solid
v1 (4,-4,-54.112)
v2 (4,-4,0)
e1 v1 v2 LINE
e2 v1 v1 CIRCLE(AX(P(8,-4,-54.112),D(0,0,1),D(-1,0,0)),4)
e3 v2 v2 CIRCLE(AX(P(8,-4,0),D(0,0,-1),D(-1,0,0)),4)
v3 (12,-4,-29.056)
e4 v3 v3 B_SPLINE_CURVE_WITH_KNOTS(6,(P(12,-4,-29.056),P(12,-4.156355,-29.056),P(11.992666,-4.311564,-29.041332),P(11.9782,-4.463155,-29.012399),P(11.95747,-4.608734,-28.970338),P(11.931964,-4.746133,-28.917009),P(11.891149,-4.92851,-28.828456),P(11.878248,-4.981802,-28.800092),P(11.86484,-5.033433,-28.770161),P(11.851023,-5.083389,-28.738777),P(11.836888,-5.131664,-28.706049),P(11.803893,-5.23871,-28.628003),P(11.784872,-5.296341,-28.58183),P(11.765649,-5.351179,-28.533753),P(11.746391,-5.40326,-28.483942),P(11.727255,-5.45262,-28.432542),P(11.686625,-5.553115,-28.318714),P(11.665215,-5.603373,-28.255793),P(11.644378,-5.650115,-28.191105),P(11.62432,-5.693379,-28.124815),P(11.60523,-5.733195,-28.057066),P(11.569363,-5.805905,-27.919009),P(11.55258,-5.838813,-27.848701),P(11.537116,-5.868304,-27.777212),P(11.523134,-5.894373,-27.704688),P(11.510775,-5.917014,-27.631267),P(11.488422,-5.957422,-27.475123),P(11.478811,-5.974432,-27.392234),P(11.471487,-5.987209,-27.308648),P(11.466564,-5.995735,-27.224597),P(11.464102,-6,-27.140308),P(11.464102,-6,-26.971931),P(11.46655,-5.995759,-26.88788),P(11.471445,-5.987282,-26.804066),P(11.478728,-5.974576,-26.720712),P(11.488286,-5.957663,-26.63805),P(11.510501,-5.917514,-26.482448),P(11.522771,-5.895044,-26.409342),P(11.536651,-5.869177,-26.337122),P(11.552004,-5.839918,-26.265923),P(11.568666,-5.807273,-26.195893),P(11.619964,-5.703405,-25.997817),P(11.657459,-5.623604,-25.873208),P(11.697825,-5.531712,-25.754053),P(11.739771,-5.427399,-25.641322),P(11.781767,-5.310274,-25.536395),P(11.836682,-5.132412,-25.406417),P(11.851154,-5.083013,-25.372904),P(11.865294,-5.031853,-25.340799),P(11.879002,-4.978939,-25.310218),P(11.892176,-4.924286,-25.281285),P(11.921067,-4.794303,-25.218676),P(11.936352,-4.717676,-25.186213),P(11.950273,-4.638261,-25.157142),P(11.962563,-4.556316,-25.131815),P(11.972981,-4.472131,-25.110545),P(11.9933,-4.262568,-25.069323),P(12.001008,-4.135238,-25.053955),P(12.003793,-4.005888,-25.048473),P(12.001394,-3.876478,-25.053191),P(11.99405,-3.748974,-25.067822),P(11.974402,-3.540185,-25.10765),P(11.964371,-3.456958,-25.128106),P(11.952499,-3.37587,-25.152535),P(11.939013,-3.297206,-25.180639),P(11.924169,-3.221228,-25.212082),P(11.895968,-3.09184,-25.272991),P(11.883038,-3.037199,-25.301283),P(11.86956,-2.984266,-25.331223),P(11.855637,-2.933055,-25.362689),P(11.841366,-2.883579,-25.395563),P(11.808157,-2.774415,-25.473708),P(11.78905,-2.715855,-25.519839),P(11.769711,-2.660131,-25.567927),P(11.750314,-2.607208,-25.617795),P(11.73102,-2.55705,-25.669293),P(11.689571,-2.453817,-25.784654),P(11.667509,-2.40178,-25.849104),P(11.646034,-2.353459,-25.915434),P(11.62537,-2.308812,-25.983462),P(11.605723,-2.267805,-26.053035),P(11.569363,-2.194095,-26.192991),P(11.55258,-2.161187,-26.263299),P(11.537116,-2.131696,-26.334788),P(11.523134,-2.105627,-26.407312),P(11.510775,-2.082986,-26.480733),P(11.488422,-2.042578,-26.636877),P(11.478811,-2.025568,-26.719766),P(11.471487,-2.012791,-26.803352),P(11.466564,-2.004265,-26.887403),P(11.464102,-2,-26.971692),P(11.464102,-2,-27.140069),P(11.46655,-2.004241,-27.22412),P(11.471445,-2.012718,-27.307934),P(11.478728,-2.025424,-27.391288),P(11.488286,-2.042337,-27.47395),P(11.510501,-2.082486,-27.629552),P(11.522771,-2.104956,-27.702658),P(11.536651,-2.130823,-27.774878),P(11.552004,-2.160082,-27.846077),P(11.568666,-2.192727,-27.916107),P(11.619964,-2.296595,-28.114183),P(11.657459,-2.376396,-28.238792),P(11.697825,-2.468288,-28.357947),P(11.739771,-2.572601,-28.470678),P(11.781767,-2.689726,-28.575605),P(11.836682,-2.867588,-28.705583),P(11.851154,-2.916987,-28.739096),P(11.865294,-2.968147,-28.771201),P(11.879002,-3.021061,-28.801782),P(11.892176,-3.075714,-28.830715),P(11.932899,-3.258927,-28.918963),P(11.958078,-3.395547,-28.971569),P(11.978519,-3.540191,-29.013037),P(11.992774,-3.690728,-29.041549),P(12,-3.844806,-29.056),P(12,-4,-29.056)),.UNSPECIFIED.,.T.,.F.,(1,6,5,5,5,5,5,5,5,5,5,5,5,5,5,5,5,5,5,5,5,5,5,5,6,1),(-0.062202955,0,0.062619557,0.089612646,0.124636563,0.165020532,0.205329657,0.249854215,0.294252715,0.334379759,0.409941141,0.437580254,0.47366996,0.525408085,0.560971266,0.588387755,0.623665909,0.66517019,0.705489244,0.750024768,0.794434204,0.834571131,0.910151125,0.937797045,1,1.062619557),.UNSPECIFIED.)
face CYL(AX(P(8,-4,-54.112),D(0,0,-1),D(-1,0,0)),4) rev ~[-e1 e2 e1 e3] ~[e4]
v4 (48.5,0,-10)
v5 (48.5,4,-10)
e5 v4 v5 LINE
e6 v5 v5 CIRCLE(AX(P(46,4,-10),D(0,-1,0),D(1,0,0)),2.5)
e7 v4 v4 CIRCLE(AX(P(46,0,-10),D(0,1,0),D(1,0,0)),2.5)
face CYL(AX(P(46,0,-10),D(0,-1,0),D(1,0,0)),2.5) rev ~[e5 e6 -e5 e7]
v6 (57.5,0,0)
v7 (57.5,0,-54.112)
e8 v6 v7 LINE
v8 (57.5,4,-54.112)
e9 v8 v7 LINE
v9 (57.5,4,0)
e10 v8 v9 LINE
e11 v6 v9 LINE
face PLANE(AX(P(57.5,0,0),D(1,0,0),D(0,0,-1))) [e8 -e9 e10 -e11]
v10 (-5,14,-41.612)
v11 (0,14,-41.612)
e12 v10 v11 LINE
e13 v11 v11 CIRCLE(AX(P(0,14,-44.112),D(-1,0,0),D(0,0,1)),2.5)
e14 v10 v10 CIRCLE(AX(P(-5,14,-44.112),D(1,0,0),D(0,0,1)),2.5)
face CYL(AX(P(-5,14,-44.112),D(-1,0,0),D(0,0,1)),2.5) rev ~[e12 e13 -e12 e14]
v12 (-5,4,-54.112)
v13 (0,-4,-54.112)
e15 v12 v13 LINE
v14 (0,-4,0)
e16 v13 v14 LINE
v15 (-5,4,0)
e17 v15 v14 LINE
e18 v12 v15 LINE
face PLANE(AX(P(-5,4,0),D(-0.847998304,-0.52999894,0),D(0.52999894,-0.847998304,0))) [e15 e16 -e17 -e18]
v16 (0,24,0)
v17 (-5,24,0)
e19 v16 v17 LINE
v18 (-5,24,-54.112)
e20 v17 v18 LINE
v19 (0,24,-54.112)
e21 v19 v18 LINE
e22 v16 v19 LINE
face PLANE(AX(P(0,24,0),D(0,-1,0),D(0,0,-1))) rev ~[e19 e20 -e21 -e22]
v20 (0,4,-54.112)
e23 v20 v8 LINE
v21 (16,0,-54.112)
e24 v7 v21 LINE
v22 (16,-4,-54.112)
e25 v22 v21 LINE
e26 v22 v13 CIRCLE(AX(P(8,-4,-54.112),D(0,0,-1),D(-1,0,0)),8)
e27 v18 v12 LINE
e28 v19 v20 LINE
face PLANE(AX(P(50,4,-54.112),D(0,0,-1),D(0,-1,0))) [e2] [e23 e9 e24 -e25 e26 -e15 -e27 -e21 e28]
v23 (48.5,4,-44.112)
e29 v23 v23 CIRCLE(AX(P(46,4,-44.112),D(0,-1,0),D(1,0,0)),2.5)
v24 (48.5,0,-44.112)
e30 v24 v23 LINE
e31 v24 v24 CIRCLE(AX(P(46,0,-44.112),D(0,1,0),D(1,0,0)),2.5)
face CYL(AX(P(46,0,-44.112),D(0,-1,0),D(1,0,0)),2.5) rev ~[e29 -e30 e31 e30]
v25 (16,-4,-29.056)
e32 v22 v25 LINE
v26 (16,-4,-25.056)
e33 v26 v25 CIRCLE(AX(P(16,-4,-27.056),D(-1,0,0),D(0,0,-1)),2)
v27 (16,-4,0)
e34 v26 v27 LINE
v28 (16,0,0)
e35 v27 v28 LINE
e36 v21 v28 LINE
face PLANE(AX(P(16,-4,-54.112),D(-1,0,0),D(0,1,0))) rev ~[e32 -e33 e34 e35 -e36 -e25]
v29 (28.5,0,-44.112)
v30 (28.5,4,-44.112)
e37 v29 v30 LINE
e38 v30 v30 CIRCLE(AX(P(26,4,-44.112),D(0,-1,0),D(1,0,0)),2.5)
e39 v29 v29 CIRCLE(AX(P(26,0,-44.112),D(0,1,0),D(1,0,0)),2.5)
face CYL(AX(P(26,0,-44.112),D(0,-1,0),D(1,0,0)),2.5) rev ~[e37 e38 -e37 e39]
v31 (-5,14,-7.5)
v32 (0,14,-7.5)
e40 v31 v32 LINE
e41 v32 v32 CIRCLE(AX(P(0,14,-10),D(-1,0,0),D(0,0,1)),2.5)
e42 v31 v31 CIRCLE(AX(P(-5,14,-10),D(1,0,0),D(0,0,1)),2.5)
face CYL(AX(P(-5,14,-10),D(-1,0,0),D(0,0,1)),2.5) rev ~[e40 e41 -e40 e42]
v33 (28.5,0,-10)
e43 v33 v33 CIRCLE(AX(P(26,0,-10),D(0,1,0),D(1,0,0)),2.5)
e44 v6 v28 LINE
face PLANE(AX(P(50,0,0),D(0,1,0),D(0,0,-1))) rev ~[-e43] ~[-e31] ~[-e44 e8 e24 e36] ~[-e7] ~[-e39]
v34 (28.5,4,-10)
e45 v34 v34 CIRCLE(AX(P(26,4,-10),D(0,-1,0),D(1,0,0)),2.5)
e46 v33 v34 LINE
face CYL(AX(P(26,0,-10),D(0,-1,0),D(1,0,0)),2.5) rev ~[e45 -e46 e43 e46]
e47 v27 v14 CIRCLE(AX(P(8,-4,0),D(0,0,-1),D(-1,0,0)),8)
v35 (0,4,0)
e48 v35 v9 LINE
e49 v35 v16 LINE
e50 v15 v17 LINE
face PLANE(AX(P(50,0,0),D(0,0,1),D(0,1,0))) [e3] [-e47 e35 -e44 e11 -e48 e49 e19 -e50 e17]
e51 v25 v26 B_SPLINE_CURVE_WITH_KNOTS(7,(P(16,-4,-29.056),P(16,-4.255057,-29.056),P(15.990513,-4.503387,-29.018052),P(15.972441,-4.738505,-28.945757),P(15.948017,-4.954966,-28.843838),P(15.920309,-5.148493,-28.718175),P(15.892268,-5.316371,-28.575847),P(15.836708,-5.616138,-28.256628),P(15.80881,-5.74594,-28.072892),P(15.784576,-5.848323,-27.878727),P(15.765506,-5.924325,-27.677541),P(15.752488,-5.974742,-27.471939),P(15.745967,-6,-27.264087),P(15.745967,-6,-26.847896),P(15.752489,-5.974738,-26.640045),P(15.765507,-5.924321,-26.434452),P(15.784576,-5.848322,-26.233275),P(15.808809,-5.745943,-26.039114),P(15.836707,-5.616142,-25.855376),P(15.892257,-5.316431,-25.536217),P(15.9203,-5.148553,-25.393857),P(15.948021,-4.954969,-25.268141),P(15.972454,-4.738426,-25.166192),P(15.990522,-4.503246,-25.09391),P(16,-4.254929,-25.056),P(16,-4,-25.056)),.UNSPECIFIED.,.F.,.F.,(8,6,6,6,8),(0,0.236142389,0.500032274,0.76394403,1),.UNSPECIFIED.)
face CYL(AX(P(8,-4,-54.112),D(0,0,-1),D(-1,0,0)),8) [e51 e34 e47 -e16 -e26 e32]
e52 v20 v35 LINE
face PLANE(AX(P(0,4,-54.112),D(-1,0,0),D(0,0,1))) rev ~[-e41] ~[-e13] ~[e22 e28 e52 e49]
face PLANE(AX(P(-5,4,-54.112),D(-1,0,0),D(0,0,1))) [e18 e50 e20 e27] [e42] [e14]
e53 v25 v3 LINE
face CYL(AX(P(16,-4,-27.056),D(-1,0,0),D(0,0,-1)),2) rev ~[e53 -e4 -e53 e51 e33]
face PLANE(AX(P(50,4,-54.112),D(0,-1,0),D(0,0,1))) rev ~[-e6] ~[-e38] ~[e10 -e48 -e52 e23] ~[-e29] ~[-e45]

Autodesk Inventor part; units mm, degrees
ref_plane "YZ Plane" through (0, 0, 0) normal (1, 0, 0) x (0, 1, 0)
ref_plane "XZ Plane" through (0, 0, 0) normal (0, 1, 0) x (-1, 0, 0)
ref_plane "XY Plane" through (0, 0, 0) normal (0, 0, 1) x (1, 0, 0)
sketch "Sketch1" plane through (0, 0, 0) normal (0, 1, 0) x (-1, 0, 0)
  line L0 (0, 0) -> (-50, 0)
  line L1 (-50, 0) -> (-50, -54.112)
  line L2 (-50, -54.112) -> (0, -54.112)
  line L3 (0, -54.112) -> (0, 0)
  dimension "d0" = 50
  dimension "d1" = 54.112
extrude "Extrusion1" add sketch "Sketch1" along normal blind 4
sketch "Sketch2" plane through (50, 0, -54.112) normal (0, 0, -1) x (-1, 0, 0)
  line L0 (50, 0) -> (42, 0)
  line L1 (0, 0) -> (50, 0) projected
  line L2 (42, 0) -> (42, -4)
  circle A0 centre (42, -4) radius 4
  circle A1 centre (42, -4) radius 8
  line L3 (50, -4) -> (50, 0)
  line L4 (34, -4) -> (34, 0)
  line L5 (34, 0) -> (35.0718, 0)
  line L6 (50, 0) -> (48.9282, 0)
  dimension "d4" = 8
  dimension "d6" = 4
  dimension "d7" = 16
extrude "Extrusion2" add sketch "Sketch2" against normal blind 54.112 contours L3 A1 L0 | A1 L1 L0 | A1 L4 L1 picked at (48.5892, -4.6382)
sketch "Sketch4" plane through (0, 0, 0) normal (0, -1, 0) x (1, 0, 0)
  line L0 (50, -54.112) -> (16, -54.112) projected
  line L1 (16, -54.112) -> (26, -54.112)
  line L2 (26, -54.112) -> (26, -44.112)
  line L3 (0, 0) -> (50, 0) projected
  line L4 (26, 0) -> (16, 0)
  line L5 (26, 0) -> (26, -10)
  line L6 (26, -10) -> (46, -10)
  line L7 (26, -44.112) -> (46, -44.112)
  circle A0 centre (46, -44.112) radius 2.5
  circle A1 centre (46, -10) radius 2.5
  circle A2 centre (26, -10) radius 2.5
  circle A3 centre (26, -44.112) radius 2.5
  dimension "d10" = 10
  dimension "d11" = 10
  dimension "d12" = 10
  dimension "d13" = 10
  dimension "d14" = 20
  dimension "d15" = 20
  dimension "d16" = 5
  dimension "d17" = 5
  dimension "d18" = 5
  dimension "d19" = 5
extrude "Extrusion3" cut sketch "Sketch4" against normal blind 54.112
sketch "Sketch5" plane through (0, 4, -54.112) normal (-1, 0, 0) x (0, 0, 1)
  line L0 (0, 0) -> (54.112, 0) projected
  line L1 (0, 0) -> (54.112, 0)
  line L2 (54.112, 0) -> (54.112, 20)
  line L3 (54.112, 20) -> (0, 20)
  line L4 (0, 20) -> (0, 0)
  point P0 (54.112, -4)
  dimension "d22" = 20
extrude "Extrusion4" add sketch "Sketch5" along normal blind 5
sketch "Sketch6" plane through (50, 0, 0) normal (0, 0, 1) x (1, 0, 0)
  line L0 (-50, 4) -> (-55, 4) projected
  line L1 (-50, -4) -> (-50, 4) projected
  line L2 (-55, 4) -> (-50, -4)
  line L3 (-50, -4) -> (-50, 4)
  line L4 (-50, 4) -> (-55, 4)
  point P0 (-50, 0)
extrude "Extrusion5" add sketch "Sketch6" against normal up to surface (54.112 mm away)
sketch "Sketch7" plane through (-5, 4, -54.112) normal (-1, 0, 0) x (0, 0, 1)
  line L0 (0, 0) -> (27.056, 0)
  line L1 (0, 20) -> (0, 0) projected
  line L2 (0, 0) -> (10, 0)
  line L3 (10, 0) -> (10, 10)
  line L4 (0, 0) -> (54.112, 0) projected
  line L5 (54.112, 0) -> (44.112, 0)
  line L6 (44.112, 0) -> (44.112, 10)
  circle A0 centre (10, 10) radius 2.5
  circle A1 centre (44.112, 10) radius 2.5
  point P0 (54.112, -4)
  dimension "d45" = 10
  dimension "d46" = 10
  dimension "d47" = 10
  dimension "d48" = 5
  dimension "d49" = 5
extrude "Extrusion6" cut sketch "Sketch7" against normal blind 10
sketch "Sketch8" plane through (50, 0, 0) normal (1, 0, 0) x (0, 0, -1)
  line L0 (54.112, 4) -> (0, 4) projected
  line L1 (0, 0) -> (54.112, 0) projected
  line L2 (0, 4) -> (54.112, 4)
  line L3 (54.112, 4) -> (54.112, 0)
  line L4 (54.112, 0) -> (0, 0)
  line L5 (0, 0) -> (0, 4)
extrude "Extrusion7" add sketch "Sketch8" along normal blind 7.5
sketch "Sketch9" plane through (16, -4, -54.112) normal (1, 0, 0) x (0, 0, -1)
  line L0 (0, 0) -> (-54.112, 0) projected
  line L1 (-54.112, 0) -> (-27.056, 0)
  circle A0 centre (-27.056, 0) radius 2
  point P0 (-54.112, 4)
  dimension "d33" = 4
hole "Hole1" at (16, -4, -27.056) direction (-1, 0, 0) diameter 4 end up to surface
thread "Thread2" size "M4x0.7" class "6H" standard "ANSI Metric M Profile" length 15
properties part number "4x2020_subaxis" material "PET Plastic"
